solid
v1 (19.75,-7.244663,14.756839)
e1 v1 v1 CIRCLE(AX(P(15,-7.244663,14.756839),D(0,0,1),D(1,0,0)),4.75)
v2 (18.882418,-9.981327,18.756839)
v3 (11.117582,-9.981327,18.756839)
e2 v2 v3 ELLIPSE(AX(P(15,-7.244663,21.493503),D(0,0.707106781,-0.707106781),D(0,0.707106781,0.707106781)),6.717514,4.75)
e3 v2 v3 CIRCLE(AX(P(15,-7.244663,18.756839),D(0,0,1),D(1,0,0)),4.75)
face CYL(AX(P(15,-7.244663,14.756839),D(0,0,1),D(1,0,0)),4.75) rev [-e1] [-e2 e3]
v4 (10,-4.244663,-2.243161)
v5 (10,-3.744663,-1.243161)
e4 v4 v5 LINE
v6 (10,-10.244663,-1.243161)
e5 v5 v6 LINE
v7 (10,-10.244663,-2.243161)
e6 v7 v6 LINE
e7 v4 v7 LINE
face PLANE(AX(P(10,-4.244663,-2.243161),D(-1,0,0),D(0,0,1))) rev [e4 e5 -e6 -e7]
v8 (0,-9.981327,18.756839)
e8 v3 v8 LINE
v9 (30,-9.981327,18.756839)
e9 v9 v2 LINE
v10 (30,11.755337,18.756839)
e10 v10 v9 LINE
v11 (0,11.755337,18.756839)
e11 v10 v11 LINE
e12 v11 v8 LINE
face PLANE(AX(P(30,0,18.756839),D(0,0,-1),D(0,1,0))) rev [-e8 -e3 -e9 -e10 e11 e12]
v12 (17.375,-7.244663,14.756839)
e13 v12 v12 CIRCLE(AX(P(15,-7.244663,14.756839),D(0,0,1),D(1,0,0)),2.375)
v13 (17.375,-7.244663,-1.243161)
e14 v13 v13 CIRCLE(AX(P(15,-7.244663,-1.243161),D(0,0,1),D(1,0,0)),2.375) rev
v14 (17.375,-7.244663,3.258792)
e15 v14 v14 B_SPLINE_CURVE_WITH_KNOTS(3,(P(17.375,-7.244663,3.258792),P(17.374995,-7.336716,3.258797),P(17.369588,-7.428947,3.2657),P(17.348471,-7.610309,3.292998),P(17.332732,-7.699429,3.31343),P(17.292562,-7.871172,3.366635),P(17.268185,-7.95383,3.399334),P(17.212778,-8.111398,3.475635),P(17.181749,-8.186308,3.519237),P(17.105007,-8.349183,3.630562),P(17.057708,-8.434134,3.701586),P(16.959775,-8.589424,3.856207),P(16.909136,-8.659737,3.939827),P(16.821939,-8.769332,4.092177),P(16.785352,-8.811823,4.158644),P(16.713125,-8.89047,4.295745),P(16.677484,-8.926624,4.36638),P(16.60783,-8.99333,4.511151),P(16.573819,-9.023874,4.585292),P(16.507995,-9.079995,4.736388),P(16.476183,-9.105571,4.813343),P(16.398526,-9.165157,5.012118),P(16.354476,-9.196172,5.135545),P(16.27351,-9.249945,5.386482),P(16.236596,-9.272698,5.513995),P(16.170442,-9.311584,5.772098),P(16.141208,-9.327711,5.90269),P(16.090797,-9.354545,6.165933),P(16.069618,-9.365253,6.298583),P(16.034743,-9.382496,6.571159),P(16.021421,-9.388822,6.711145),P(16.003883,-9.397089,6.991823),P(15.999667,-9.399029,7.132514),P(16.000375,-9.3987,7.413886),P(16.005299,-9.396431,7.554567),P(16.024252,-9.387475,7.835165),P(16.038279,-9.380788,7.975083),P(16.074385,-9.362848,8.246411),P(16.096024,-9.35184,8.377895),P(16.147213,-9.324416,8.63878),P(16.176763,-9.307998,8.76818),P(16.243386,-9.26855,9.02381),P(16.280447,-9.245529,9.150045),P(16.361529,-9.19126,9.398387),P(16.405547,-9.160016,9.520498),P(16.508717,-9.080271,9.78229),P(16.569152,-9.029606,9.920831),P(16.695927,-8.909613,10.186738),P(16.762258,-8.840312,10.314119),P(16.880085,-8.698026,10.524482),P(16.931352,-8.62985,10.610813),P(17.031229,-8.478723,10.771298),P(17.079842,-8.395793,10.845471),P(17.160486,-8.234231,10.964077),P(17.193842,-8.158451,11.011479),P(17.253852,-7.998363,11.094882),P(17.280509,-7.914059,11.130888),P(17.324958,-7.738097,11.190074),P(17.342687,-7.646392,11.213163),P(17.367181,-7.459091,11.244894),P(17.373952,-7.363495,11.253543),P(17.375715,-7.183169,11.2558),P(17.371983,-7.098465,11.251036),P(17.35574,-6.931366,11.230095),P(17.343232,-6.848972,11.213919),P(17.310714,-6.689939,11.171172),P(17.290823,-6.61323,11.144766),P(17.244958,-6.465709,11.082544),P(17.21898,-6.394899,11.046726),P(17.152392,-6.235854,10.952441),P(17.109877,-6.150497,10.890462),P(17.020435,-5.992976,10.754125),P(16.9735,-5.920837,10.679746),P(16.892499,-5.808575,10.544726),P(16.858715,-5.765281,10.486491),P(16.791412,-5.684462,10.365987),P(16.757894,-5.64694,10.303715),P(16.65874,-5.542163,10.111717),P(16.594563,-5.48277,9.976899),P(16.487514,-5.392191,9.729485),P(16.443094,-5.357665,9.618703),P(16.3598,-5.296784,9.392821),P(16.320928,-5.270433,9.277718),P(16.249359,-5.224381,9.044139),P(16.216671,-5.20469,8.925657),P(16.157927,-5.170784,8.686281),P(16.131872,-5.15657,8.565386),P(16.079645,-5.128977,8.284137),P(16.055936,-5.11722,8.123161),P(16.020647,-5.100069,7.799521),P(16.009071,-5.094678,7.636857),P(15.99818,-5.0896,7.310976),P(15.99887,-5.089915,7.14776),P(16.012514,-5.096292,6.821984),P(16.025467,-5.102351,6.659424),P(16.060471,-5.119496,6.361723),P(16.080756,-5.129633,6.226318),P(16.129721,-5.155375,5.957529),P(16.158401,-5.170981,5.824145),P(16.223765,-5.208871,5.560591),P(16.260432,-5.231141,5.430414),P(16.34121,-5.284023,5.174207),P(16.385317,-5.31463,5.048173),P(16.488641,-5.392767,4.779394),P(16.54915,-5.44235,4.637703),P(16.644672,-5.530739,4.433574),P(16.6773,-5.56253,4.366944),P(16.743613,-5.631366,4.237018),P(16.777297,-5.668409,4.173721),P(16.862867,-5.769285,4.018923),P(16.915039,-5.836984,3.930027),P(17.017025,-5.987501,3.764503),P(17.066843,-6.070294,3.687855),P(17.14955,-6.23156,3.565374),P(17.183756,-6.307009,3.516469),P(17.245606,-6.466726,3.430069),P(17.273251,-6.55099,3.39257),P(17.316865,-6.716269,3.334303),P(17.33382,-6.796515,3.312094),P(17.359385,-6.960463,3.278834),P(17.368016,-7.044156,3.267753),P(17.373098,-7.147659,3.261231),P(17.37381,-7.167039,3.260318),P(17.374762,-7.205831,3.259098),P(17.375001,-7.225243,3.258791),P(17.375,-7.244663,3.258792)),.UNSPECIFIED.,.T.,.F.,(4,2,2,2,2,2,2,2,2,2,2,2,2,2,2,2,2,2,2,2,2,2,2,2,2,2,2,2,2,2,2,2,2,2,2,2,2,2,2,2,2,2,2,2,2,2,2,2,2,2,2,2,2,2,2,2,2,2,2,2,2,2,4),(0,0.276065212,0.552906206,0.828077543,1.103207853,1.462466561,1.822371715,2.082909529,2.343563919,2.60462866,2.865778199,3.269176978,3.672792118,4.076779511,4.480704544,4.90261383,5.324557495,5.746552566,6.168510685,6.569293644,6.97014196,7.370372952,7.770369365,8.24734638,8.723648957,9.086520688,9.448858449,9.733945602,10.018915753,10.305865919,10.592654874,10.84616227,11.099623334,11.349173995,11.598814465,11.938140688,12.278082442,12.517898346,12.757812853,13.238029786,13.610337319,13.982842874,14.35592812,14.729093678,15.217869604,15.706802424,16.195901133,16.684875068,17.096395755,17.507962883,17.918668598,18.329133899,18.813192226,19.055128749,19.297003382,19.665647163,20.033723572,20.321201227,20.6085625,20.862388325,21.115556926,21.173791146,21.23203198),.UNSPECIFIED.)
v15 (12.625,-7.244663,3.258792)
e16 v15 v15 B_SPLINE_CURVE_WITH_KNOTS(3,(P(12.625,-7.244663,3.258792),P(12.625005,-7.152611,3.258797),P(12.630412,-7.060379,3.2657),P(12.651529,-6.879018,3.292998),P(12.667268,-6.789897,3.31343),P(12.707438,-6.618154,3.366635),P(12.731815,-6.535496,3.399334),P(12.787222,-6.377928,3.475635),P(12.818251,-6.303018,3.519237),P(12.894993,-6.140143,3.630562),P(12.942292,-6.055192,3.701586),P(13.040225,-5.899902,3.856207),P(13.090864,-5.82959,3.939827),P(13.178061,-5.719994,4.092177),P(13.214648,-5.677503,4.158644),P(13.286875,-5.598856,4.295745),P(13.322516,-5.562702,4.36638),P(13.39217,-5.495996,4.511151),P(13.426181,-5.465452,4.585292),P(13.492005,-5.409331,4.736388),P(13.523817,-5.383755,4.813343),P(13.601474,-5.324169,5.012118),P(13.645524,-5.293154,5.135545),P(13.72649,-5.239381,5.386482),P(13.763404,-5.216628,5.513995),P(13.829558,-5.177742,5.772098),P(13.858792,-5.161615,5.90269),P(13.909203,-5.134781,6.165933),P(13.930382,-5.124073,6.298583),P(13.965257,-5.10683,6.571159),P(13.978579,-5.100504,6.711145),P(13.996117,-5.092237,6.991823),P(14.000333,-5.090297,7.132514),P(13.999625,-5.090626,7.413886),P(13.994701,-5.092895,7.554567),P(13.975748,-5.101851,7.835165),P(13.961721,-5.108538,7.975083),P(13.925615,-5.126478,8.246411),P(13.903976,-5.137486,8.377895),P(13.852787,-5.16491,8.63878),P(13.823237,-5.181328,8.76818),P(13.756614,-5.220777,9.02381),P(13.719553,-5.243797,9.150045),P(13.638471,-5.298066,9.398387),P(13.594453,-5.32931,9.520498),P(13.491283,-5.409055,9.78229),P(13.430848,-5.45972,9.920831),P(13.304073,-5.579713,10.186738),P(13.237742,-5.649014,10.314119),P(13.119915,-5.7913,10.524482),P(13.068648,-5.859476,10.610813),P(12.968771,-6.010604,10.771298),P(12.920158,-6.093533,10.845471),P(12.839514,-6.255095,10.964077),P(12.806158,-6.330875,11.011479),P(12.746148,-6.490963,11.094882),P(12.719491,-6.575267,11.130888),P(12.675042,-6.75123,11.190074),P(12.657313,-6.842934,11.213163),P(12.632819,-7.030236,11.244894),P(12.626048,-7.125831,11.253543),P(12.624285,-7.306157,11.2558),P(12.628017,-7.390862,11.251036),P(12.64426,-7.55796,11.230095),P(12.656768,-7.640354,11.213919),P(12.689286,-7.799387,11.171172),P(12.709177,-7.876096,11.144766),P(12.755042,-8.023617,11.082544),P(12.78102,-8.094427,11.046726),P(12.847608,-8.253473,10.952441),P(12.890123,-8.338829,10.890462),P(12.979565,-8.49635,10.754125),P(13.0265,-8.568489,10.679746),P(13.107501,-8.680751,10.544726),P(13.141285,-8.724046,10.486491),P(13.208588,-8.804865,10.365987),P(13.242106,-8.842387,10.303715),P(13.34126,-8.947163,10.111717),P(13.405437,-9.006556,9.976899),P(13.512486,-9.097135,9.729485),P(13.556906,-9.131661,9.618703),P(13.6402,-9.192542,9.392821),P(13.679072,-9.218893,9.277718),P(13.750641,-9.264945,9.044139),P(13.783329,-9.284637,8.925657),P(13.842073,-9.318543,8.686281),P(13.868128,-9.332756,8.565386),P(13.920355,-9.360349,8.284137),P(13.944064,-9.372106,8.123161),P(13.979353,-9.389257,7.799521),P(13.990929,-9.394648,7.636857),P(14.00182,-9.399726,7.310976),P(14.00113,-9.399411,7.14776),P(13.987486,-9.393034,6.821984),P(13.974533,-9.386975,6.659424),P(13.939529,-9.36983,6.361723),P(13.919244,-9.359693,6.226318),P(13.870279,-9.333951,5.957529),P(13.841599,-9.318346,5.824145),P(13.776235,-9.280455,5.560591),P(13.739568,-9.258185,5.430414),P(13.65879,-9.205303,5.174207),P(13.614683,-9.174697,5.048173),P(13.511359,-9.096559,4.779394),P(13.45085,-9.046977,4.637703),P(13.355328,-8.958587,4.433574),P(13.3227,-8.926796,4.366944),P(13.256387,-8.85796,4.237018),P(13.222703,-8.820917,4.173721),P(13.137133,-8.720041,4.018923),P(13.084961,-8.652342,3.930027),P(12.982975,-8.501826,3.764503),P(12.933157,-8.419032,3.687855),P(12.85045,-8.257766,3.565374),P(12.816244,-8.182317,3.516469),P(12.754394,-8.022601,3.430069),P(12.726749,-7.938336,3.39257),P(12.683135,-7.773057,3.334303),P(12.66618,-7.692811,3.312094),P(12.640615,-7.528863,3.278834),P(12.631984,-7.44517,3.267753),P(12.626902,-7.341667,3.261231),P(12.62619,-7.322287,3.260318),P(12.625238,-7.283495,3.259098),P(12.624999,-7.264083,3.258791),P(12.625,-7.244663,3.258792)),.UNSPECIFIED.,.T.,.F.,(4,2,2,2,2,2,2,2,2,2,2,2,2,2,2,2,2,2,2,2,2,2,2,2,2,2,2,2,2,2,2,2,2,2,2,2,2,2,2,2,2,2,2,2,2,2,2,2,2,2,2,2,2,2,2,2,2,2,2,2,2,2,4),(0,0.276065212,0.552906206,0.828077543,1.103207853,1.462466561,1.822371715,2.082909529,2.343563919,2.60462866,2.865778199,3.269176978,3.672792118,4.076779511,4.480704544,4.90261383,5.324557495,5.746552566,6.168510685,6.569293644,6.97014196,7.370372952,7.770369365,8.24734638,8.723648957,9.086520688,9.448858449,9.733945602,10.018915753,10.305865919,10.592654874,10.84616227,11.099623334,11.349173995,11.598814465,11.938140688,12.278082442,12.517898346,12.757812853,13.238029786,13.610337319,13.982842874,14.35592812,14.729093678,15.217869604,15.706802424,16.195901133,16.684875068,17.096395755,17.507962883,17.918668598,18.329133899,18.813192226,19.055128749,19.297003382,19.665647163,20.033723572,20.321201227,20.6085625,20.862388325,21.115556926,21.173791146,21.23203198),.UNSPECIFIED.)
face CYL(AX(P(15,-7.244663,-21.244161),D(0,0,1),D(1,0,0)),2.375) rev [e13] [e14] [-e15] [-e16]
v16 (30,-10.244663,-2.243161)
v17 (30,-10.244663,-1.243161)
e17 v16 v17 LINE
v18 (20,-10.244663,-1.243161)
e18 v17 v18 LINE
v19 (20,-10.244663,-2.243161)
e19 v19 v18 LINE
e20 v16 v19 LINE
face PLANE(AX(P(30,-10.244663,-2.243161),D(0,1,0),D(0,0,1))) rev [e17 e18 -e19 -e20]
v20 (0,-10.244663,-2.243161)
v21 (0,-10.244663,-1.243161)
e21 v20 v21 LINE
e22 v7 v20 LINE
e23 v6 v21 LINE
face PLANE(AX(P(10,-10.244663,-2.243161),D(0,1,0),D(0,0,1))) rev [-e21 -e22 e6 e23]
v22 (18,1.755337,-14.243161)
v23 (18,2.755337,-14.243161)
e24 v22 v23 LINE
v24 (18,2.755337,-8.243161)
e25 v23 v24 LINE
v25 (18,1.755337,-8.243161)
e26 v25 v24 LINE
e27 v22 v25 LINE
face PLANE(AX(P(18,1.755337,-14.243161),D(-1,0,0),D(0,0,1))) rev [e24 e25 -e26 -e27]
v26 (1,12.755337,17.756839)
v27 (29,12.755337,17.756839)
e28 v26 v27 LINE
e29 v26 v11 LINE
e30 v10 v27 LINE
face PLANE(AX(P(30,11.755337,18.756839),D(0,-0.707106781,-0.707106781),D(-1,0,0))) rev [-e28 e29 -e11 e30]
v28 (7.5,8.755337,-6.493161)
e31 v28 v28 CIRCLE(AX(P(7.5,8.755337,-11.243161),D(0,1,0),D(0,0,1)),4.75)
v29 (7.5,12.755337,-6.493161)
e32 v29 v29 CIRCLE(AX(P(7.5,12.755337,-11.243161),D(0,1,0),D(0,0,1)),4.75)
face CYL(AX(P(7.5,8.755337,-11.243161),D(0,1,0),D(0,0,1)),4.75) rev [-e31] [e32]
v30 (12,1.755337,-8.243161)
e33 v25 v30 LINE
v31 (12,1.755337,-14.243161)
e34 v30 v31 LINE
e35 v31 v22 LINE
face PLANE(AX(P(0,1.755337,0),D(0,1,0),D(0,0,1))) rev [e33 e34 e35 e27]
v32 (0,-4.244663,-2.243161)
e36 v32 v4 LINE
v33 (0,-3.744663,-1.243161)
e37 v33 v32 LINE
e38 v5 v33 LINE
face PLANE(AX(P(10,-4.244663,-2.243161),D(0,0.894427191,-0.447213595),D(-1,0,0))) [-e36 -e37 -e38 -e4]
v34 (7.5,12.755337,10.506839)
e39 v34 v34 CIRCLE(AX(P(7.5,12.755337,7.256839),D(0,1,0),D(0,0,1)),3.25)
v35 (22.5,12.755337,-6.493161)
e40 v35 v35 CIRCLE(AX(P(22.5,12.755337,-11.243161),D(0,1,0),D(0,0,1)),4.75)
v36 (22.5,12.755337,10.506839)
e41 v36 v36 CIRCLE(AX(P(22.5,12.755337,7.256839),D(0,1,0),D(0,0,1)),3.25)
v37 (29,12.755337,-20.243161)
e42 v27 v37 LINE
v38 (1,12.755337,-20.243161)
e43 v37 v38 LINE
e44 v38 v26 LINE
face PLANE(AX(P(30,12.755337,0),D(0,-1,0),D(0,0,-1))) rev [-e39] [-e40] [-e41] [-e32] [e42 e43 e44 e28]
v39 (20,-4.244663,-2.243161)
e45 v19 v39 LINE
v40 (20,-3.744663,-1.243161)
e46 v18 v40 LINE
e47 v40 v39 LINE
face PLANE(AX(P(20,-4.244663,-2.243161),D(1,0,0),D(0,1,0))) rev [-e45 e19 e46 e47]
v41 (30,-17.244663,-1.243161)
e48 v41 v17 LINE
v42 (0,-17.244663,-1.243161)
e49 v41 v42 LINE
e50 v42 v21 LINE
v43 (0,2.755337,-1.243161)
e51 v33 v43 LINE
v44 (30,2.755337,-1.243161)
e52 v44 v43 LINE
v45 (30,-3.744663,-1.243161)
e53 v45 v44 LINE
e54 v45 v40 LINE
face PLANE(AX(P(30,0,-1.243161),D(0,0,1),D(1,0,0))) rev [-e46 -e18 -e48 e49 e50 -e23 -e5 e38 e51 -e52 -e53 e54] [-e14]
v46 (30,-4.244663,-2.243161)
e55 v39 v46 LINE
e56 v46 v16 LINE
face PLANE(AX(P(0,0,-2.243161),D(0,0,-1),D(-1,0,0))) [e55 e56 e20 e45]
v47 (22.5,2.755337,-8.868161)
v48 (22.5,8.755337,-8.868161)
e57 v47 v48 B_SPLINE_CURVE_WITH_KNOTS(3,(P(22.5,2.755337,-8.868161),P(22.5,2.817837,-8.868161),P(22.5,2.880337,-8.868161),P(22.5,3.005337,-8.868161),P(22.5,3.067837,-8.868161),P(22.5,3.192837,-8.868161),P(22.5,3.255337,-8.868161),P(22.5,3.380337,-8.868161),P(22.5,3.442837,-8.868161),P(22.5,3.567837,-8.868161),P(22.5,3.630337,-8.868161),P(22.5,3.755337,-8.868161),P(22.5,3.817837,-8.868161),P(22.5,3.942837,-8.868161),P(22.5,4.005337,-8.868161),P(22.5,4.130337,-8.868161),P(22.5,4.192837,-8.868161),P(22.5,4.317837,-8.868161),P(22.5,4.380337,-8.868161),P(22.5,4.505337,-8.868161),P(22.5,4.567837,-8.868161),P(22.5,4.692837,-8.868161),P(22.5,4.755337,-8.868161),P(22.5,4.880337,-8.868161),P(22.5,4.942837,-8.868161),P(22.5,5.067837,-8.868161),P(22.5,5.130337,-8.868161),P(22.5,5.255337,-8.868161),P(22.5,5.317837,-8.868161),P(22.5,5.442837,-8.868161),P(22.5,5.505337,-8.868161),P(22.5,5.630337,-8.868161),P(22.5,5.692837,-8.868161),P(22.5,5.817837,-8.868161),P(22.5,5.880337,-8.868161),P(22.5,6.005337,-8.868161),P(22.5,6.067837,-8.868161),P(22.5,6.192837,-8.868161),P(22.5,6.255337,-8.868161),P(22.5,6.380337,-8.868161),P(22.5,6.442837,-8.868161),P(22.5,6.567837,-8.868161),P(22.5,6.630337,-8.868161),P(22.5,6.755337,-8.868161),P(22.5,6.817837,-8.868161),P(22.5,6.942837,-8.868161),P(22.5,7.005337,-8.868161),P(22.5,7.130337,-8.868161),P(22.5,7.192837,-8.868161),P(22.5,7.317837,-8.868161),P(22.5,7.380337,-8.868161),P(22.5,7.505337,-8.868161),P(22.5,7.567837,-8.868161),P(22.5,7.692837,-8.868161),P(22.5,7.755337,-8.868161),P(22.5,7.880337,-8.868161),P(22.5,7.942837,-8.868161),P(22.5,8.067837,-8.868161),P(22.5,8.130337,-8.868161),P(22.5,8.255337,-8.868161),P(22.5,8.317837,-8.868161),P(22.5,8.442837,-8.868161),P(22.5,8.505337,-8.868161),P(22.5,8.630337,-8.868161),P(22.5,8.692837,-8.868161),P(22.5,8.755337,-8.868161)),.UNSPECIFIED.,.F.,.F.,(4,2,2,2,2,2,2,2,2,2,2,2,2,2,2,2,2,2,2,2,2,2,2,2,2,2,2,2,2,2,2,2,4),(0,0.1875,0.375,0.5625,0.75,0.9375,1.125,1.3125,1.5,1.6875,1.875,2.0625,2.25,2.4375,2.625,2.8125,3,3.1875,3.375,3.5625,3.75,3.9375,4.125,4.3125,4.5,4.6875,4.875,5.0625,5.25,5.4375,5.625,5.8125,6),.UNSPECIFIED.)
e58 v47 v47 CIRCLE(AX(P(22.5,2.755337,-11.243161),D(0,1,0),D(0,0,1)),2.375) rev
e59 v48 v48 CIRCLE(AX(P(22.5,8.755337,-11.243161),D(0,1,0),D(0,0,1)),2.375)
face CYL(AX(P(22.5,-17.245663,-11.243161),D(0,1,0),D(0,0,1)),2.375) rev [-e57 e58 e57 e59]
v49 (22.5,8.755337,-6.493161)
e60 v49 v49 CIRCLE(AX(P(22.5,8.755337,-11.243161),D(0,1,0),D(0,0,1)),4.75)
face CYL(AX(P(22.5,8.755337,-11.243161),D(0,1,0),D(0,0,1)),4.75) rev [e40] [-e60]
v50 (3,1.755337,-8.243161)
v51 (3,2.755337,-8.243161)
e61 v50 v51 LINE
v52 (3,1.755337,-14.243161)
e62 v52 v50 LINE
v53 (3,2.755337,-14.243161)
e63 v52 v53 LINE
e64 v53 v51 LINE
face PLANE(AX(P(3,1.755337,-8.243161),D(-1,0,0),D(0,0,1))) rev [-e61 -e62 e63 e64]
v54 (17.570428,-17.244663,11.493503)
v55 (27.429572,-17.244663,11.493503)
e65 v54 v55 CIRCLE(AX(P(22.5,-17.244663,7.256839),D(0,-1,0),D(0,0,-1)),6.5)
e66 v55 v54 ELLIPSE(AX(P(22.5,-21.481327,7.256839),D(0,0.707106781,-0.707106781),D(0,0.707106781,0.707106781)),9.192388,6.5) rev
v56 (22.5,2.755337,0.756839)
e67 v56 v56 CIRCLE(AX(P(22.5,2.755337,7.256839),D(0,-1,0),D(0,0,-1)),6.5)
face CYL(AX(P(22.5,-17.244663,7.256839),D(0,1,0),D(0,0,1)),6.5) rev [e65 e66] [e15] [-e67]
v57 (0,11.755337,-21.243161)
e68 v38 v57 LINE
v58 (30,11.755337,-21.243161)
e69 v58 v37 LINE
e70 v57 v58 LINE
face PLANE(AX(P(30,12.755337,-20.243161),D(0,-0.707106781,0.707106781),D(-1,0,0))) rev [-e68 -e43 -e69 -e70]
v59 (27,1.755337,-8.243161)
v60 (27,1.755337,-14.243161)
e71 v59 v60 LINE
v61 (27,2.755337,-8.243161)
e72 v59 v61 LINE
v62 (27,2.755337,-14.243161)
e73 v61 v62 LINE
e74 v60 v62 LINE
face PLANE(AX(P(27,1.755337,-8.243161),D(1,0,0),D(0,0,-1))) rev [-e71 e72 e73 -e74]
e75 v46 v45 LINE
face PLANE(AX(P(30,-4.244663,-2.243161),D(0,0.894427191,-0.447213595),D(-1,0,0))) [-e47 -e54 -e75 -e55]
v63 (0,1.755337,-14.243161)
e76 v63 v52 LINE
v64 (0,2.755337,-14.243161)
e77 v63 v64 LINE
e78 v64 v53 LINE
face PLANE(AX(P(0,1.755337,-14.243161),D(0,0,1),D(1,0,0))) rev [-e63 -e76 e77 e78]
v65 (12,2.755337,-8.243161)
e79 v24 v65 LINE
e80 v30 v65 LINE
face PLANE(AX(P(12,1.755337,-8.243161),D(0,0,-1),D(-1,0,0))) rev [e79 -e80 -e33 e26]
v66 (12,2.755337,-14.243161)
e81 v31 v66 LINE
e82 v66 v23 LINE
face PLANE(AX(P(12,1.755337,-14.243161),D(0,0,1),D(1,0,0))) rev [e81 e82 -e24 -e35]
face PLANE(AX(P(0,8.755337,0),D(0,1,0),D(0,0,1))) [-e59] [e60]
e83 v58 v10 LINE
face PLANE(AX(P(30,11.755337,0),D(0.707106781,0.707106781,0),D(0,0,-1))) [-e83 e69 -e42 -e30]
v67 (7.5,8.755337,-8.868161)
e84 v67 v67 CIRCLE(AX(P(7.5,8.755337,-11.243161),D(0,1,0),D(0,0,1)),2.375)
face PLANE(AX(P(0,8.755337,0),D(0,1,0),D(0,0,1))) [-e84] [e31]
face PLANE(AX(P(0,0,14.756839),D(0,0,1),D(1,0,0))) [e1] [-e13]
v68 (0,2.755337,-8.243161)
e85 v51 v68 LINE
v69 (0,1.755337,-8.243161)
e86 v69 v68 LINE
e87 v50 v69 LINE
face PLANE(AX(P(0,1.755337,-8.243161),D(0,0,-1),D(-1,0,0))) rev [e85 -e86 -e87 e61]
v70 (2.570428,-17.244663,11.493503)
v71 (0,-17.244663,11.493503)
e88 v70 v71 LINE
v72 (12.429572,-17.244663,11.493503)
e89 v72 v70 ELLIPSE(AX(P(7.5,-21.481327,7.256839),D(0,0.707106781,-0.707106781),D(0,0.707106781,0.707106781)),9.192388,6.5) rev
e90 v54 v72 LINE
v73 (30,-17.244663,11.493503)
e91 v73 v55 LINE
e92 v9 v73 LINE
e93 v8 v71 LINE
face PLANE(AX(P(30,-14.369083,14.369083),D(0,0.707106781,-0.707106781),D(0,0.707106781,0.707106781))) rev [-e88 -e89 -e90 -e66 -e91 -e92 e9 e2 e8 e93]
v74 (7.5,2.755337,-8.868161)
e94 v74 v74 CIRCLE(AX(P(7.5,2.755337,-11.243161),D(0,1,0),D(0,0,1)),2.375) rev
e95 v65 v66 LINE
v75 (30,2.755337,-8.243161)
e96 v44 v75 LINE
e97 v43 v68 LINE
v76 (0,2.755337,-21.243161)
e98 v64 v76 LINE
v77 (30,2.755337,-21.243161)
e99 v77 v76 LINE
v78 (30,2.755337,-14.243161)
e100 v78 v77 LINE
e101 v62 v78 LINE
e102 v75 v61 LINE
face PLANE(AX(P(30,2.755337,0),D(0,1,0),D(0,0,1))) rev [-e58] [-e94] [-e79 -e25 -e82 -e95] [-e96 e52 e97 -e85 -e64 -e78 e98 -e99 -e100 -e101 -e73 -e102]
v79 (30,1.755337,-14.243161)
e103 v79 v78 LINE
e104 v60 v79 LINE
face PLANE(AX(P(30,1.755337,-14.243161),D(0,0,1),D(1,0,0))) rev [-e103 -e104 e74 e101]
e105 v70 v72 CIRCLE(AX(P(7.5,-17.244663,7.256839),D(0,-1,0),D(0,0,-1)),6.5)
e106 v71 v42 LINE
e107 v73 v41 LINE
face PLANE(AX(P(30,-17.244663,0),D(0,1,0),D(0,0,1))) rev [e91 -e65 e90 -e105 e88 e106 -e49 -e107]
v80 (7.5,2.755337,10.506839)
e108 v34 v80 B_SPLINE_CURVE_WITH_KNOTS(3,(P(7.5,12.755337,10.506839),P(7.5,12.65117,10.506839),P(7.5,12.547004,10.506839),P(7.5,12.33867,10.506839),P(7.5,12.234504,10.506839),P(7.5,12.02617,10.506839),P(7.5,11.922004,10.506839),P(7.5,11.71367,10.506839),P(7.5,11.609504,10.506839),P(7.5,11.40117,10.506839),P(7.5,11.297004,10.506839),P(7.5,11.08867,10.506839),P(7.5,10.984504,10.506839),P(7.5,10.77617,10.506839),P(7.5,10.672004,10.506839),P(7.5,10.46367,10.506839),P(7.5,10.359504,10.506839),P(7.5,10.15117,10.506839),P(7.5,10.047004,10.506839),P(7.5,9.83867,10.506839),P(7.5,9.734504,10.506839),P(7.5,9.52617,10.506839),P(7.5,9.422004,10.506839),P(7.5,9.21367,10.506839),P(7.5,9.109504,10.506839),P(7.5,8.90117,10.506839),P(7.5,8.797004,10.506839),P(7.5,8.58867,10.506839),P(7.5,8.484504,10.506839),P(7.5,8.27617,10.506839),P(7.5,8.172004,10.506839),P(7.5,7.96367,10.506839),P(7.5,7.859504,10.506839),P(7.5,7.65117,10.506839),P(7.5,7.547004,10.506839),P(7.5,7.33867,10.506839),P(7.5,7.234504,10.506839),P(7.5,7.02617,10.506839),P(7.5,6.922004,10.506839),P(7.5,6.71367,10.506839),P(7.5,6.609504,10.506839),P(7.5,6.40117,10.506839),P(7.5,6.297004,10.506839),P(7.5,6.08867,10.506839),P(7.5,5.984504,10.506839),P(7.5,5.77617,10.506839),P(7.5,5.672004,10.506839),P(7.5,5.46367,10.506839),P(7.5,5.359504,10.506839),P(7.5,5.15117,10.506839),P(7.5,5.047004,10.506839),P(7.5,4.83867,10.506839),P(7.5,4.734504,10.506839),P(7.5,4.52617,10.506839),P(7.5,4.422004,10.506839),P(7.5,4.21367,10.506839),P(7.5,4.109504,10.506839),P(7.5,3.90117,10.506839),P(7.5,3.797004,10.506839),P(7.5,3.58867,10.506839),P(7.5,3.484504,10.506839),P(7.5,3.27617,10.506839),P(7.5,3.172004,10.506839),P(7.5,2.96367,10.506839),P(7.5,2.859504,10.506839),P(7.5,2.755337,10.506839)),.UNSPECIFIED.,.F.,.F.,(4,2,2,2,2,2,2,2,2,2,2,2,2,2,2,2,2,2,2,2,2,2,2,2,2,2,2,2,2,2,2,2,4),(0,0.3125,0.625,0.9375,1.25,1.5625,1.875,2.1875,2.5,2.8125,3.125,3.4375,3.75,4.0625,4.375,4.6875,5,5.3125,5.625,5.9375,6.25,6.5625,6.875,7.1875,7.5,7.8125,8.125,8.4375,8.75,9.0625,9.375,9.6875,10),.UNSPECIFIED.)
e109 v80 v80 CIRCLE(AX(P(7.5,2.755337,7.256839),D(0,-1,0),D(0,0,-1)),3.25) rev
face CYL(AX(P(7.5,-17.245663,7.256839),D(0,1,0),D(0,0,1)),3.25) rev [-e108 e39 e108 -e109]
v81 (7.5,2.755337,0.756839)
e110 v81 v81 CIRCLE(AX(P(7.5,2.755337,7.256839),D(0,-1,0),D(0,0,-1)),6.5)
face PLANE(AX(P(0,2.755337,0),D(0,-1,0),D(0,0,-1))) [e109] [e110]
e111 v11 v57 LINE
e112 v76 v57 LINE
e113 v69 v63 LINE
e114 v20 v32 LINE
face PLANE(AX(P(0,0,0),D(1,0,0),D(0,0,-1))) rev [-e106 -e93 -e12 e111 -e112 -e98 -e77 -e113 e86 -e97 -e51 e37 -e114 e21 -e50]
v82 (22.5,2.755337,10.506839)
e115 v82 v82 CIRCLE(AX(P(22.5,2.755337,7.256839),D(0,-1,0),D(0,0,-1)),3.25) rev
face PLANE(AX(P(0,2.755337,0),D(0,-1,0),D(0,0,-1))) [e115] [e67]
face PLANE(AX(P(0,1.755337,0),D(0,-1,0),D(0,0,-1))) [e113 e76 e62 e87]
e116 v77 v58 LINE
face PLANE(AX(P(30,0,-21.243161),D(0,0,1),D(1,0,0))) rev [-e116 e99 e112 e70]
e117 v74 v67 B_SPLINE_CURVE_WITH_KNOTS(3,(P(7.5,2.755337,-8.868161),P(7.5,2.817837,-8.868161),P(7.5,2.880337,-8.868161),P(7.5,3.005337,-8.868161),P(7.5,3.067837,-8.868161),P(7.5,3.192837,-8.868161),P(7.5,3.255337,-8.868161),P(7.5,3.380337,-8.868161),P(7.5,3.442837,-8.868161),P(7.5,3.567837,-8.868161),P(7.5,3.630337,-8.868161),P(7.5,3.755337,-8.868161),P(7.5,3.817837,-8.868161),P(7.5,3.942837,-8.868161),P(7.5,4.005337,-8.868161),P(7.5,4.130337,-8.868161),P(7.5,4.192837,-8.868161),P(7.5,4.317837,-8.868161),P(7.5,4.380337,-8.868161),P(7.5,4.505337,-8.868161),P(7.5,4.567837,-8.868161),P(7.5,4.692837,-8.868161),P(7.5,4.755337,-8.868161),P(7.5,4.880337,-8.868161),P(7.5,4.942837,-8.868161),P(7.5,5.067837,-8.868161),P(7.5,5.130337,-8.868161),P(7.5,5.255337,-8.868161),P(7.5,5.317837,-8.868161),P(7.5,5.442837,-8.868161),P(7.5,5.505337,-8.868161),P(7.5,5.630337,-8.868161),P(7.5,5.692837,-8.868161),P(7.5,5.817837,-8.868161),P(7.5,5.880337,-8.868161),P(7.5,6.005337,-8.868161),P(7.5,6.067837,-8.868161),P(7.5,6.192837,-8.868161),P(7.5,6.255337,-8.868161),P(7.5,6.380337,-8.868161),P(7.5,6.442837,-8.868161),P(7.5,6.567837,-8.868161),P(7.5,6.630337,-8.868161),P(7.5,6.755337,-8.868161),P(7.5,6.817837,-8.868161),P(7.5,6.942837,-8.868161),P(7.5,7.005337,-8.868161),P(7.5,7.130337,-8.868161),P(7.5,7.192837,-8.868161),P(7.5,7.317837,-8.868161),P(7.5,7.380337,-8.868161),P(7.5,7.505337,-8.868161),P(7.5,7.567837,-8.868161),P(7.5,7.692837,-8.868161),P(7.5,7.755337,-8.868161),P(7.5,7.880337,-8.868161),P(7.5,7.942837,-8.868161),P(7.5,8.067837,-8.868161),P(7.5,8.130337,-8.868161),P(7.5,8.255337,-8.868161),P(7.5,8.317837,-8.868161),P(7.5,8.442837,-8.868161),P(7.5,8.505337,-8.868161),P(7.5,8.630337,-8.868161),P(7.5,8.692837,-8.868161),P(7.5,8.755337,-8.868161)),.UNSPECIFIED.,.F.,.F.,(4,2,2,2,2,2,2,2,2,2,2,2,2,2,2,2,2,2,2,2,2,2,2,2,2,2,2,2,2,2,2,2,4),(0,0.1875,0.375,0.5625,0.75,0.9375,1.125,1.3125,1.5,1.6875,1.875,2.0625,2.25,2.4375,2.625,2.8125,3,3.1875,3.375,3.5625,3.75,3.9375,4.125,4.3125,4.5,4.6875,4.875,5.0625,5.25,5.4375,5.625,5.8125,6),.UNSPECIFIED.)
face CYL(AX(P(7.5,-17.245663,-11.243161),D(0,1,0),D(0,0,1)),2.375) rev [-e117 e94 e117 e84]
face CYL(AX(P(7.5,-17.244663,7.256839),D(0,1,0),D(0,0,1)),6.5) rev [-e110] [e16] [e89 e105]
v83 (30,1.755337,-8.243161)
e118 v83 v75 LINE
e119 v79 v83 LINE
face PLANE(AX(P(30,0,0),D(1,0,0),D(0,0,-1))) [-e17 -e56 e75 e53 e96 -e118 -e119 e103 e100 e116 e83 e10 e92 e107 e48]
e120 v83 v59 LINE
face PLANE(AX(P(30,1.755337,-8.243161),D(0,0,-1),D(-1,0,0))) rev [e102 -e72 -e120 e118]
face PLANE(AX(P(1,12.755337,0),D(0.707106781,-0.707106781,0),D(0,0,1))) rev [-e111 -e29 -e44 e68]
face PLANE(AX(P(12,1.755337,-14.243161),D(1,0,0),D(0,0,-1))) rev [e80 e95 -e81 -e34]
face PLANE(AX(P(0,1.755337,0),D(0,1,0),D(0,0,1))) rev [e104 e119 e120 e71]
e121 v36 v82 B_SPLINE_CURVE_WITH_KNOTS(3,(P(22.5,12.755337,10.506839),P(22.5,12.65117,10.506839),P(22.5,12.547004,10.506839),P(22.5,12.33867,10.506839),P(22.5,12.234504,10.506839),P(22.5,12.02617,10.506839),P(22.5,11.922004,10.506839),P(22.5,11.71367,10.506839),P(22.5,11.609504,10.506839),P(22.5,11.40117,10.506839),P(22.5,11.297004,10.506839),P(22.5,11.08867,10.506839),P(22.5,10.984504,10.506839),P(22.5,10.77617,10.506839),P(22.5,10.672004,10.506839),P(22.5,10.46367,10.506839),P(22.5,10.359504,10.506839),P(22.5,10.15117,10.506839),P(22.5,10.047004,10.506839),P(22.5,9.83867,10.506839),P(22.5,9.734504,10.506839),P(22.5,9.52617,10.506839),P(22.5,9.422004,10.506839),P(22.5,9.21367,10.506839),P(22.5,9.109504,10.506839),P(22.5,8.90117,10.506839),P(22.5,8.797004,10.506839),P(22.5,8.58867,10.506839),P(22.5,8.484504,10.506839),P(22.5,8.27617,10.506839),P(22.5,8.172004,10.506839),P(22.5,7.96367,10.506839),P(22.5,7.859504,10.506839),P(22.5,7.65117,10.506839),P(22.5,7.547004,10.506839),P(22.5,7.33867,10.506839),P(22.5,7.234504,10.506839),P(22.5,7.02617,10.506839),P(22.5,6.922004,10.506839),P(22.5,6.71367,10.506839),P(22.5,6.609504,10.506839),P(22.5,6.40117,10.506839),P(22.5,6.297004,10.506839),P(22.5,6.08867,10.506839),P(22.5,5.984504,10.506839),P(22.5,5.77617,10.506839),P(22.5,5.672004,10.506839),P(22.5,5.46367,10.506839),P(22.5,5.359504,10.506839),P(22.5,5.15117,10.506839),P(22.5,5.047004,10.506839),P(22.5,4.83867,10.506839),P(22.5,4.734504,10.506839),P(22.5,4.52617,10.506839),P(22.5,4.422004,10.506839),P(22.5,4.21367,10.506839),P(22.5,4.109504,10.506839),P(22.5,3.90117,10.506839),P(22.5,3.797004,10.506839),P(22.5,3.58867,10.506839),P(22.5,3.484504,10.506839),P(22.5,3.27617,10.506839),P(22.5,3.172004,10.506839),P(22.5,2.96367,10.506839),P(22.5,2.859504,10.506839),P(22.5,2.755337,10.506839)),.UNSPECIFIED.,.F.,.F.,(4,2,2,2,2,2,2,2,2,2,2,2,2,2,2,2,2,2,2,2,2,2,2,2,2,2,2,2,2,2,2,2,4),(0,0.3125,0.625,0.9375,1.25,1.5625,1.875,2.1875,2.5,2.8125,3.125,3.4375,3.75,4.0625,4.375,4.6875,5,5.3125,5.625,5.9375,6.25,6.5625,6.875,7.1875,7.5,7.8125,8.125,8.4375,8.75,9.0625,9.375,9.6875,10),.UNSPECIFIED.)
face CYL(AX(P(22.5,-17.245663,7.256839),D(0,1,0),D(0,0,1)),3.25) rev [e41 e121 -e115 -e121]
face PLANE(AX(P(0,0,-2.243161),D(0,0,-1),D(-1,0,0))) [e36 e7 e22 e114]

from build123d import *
from OCP.BRepFilletAPI import BRepFilletAPI_MakeChamfer

# Parameters (mm, degrees)
RESSALTO_EXTRUS_O1_DEPTH = 30
CORTE_EXTRUS_O1_REACH    = 49.448
ESBO_O2_R                = 2.375
ESBO_O2_R_2              = 3.25
ESBO_O2_3_R              = 4.75
ESBO_O2_3_R_2            = 2.375
CORTE_EXTRUS_O3_DEPTH    = 4
CORTE_EXTRUS_O2_REACH    = 54.89
ESBO_O3_R                = 2.375
ESBO_O3_3_R              = 2.375
CORTE_EXTRUS_O4_DEPTH    = 4
ESBO_O4_W                = 6
ESBO_O4_H                = 6
ESBO_O4_W_2              = 3
RESSALTO_EXTRUS_O2_DEPTH = 1
ESBO_O5_R                = 6.5
CORTE_EXTRUS_O5_DEPTH    = 42.848200707
CHANFRO1_SIZE            = 1
ESBO_O6_W                = 10
ESBO_O6_H                = 6
RESSALTO_EXTRUS_O3_DEPTH = 1
CHANFRO2_SIZE            = 0.5
CHANFRO2_SIZE_2          = 1


with BuildPart() as part:
    # Esboço1 → Ressalto-extrusão1 (new body)
    with BuildSketch(Plane(origin=(0, 0, 0), x_dir=(0, 0, -1), z_dir=(1, 0, 0))):
        Polygon((21.243161309, 12.755336939), (-18.756838691, 12.755336939), (-18.756838691, -9.981327227), (-11.493502857, -17.244663061), (1.243161309, -17.244663061), (1.243161309, 2.755336939), (21.243161309, 2.755336939), align=None)
    extrude(amount=RESSALTO_EXTRUS_O1_DEPTH)

    # Esboço2 → Corte-extrusão1 (cut, up to next)
    with BuildSketch(Plane(origin=(0, 12.755336939, 0), x_dir=(1, 0, 0), z_dir=(0, 1, 0)), mode=Mode.PRIVATE) as corte_extrus_o1_sk1:
        with Locations(Location((7.5, 11.243161309, 0), (0, 0, 270))):
            Circle(ESBO_O2_R)
    corte_extrus_o1_tool1 = extrude(corte_extrus_o1_sk1.sketch, amount=-CORTE_EXTRUS_O1_REACH, mode=Mode.PRIVATE) & part.part
    # Esboço2 → Corte-extrusão1 (cut, up to next)
    with BuildSketch(Plane(origin=(0, 12.755336939, 0), x_dir=(1, 0, 0), z_dir=(0, 1, 0)), mode=Mode.PRIVATE) as corte_extrus_o1_sk2:
        with Locations(Location((22.5, 11.243161309, 0), (0, 0, 270))):
            Circle(ESBO_O2_R)
    corte_extrus_o1_tool2 = extrude(corte_extrus_o1_sk2.sketch, amount=-CORTE_EXTRUS_O1_REACH, mode=Mode.PRIVATE) & part.part
    # Esboço2 → Corte-extrusão1 (cut, up to next)
    with BuildSketch(Plane(origin=(0, 12.755336939, 0), x_dir=(1, 0, 0), z_dir=(0, 1, 0)), mode=Mode.PRIVATE) as corte_extrus_o1_sk3:
        with Locations(Location((22.5, -7.256838691, 0), (0, 0, 270))):
            Circle(ESBO_O2_R_2)
    corte_extrus_o1_tool3 = extrude(corte_extrus_o1_sk3.sketch, amount=-CORTE_EXTRUS_O1_REACH, mode=Mode.PRIVATE) & part.part
    # Esboço2 → Corte-extrusão1 (cut, up to next)
    with BuildSketch(Plane(origin=(0, 12.755336939, 0), x_dir=(1, 0, 0), z_dir=(0, 1, 0)), mode=Mode.PRIVATE) as corte_extrus_o1_sk4:
        with Locations(Location((7.5, -7.256838691, 0), (0, 0, 270))):
            Circle(ESBO_O2_R_2)
    corte_extrus_o1_tool4 = extrude(corte_extrus_o1_sk4.sketch, amount=-CORTE_EXTRUS_O1_REACH, mode=Mode.PRIVATE) & part.part
    add(corte_extrus_o1_tool1.solids().sort_by_distance((7.5, 12.755337, -11.243161))[0], mode=Mode.SUBTRACT)
    add(corte_extrus_o1_tool2.solids().sort_by_distance((22.5, 12.755337, -11.243161))[0], mode=Mode.SUBTRACT)
    add(corte_extrus_o1_tool3.solids().sort_by_distance((22.5, 12.755337, 7.256839))[0], mode=Mode.SUBTRACT)
    add(corte_extrus_o1_tool4.solids().sort_by_distance((7.5, 12.755337, 7.256839))[0], mode=Mode.SUBTRACT)

    # Esboço2<3> → Corte-extrusão3 (cut)
    # profile 1 of 2: a face of its own
    with BuildSketch(Plane(origin=(0, 12.755336939, 0), x_dir=(1, 0, 0), z_dir=(0, 1, 0))):
        with Locations(Location((7.5, 11.243161309, 0), (0, 0, 270))):
            Circle(ESBO_O2_3_R)
        with Locations(Location((7.5, 11.243161309, 0), (0, 0, 270))):
            Circle(ESBO_O2_3_R_2, mode=Mode.SUBTRACT)
    # profile 2 of 2: a face of its own
    with BuildSketch(Plane(origin=(0, 12.755336939, 0), x_dir=(1, 0, 0), z_dir=(0, 1, 0))):
        with Locations(Location((22.5, 11.243161309, 0), (0, 0, 270))):
            Circle(ESBO_O2_3_R)
        with Locations(Location((22.5, 11.243161309, 0), (0, 0, 270))):
            Circle(ESBO_O2_3_R_2, mode=Mode.SUBTRACT)
    extrude(amount=-CORTE_EXTRUS_O3_DEPTH, mode=Mode.SUBTRACT)

    # Esboço3 → Corte-extrusão2 (cut, up to next)
    with BuildSketch(Plane.XY.offset(18.756838691), mode=Mode.PRIVATE) as corte_extrus_o2_sk1:
        with Locations((15, -7.244663061)):
            Circle(ESBO_O3_R)
    corte_extrus_o2_tool1 = extrude(corte_extrus_o2_sk1.sketch, amount=-CORTE_EXTRUS_O2_REACH, mode=Mode.PRIVATE) & part.part
    add(corte_extrus_o2_tool1.solids().sort_by_distance((15, -7.244663, 18.756839))[0], mode=Mode.SUBTRACT)

    # Esboço3<3> → Corte-extrusão4 (cut)
    # profile 1 of 2: a face of its own
    with BuildSketch(Plane.XY.offset(18.756838691)):
        with BuildLine():
            Line((18.882417963, -9.981327227), (11.117582037, -9.981327227))
            ThreePointArc((11.117582037, -9.981327227), (15, -11.994663061), (18.882417963, -9.981327227))
        make_face()
    # profile 2 of 2: a face of its own
    with BuildSketch(Plane.XY.offset(18.756838691)):
        with BuildLine():
            ThreePointArc((18.882417963, -9.981327227), (19.527912617, -8.680109799), (19.75, -7.244663061))
            ThreePointArc((19.75, -7.244663061), (13.564553262, -2.716750444), (11.117582037, -9.981327227))
            Line((11.117582037, -9.981327227), (18.882417963, -9.981327227))
        make_face()
        with Locations((15, -7.244663061)):
            Circle(ESBO_O3_3_R, mode=Mode.SUBTRACT)
    extrude(amount=-CORTE_EXTRUS_O4_DEPTH, mode=Mode.SUBTRACT)

    # Esboço4 → Ressalto-extrusão2 (add)
    with BuildSketch(Plane.XZ.offset(-2.755336939)):
        with Locations((15, -11.243161309)):
            Rectangle(ESBO_O4_W, ESBO_O4_H)
        with Locations((1.5, -11.243161309)):
            Rectangle(ESBO_O4_W_2, ESBO_O4_H)
        with Locations((28.5, -11.243161309)):
            Rectangle(ESBO_O4_W_2, ESBO_O4_H)
    extrude(amount=RESSALTO_EXTRUS_O2_DEPTH)

    # Esboço5 → Corte-extrusão5 (cut, through all)
    with BuildSketch(Plane.XZ.offset(-2.755336939)):
        with Locations(Location((7.5, 7.256838691, 0), (0, 0, 40.677035539))):
            Circle(ESBO_O5_R)
        with Locations(Location((22.5, 7.256838691, 0), (0, 0, 40.677035539))):
            Circle(ESBO_O5_R)
    extrude(amount=CORTE_EXTRUS_O5_DEPTH, mode=Mode.SUBTRACT)

    # Chanfro1
    chanfro1_edges = [part.edges().sort_by_distance(p)[0] for p in [
        (0, 12.755336939, -1.243161309),
        (30, 12.755336939, -1.243161309),
        (15, 12.755336939, 18.756838691),
        (15, 12.755336939, -21.243161309),
    ]]
    chamfer(chanfro1_edges, length=CHANFRO1_SIZE)

    # Esboço6 → Ressalto-extrusão3 (add)
    with BuildSketch(Plane(origin=(0, 0, -1.243161309), x_dir=(-1, 0, 0), z_dir=(0, 0, -1))):
        with Locations((-25, -7.244663061)):
            Rectangle(ESBO_O6_W, ESBO_O6_H)
        with Locations((-5, -7.244663061)):
            Rectangle(ESBO_O6_W, ESBO_O6_H)
    extrude(amount=RESSALTO_EXTRUS_O3_DEPTH)

    # Chanfro2
    chanfro2_edges_1 = [part.edges().sort_by_distance(p)[0] for p in [
        (25, -4.244663061, -1.243161309),
    ]]
    chanfro2_side_1 = [part.faces().sort_by_distance(p)[0] for p in [
        (25, -4.234663061, -1.243161309),
    ]]
    chanfro2_edges_2 = [part.edges().sort_by_distance(p)[0] for p in [
        (5, -4.244663061, -1.243161309),
    ]]
    chanfro2_side_2 = [part.faces().sort_by_distance(p)[0] for p in [
        (5, -4.234663061, -1.243161309),
    ]]
    chanfro2 = BRepFilletAPI_MakeChamfer(part.part.solid().wrapped)
    for e in chanfro2_edges_1:
        chanfro2.Add(CHANFRO2_SIZE - 0.0001, CHANFRO2_SIZE_2 - 0.0001, e.wrapped, chanfro2_side_1[0].wrapped)
    for e in chanfro2_edges_2:
        chanfro2.Add(CHANFRO2_SIZE - 0.0001, CHANFRO2_SIZE_2 - 0.0001, e.wrapped, chanfro2_side_2[0].wrapped)
    add(Compound.cast(chanfro2.Shape()), mode=Mode.REPLACE)  # a hair under: the kernel refuses the full size


solid = part.part
